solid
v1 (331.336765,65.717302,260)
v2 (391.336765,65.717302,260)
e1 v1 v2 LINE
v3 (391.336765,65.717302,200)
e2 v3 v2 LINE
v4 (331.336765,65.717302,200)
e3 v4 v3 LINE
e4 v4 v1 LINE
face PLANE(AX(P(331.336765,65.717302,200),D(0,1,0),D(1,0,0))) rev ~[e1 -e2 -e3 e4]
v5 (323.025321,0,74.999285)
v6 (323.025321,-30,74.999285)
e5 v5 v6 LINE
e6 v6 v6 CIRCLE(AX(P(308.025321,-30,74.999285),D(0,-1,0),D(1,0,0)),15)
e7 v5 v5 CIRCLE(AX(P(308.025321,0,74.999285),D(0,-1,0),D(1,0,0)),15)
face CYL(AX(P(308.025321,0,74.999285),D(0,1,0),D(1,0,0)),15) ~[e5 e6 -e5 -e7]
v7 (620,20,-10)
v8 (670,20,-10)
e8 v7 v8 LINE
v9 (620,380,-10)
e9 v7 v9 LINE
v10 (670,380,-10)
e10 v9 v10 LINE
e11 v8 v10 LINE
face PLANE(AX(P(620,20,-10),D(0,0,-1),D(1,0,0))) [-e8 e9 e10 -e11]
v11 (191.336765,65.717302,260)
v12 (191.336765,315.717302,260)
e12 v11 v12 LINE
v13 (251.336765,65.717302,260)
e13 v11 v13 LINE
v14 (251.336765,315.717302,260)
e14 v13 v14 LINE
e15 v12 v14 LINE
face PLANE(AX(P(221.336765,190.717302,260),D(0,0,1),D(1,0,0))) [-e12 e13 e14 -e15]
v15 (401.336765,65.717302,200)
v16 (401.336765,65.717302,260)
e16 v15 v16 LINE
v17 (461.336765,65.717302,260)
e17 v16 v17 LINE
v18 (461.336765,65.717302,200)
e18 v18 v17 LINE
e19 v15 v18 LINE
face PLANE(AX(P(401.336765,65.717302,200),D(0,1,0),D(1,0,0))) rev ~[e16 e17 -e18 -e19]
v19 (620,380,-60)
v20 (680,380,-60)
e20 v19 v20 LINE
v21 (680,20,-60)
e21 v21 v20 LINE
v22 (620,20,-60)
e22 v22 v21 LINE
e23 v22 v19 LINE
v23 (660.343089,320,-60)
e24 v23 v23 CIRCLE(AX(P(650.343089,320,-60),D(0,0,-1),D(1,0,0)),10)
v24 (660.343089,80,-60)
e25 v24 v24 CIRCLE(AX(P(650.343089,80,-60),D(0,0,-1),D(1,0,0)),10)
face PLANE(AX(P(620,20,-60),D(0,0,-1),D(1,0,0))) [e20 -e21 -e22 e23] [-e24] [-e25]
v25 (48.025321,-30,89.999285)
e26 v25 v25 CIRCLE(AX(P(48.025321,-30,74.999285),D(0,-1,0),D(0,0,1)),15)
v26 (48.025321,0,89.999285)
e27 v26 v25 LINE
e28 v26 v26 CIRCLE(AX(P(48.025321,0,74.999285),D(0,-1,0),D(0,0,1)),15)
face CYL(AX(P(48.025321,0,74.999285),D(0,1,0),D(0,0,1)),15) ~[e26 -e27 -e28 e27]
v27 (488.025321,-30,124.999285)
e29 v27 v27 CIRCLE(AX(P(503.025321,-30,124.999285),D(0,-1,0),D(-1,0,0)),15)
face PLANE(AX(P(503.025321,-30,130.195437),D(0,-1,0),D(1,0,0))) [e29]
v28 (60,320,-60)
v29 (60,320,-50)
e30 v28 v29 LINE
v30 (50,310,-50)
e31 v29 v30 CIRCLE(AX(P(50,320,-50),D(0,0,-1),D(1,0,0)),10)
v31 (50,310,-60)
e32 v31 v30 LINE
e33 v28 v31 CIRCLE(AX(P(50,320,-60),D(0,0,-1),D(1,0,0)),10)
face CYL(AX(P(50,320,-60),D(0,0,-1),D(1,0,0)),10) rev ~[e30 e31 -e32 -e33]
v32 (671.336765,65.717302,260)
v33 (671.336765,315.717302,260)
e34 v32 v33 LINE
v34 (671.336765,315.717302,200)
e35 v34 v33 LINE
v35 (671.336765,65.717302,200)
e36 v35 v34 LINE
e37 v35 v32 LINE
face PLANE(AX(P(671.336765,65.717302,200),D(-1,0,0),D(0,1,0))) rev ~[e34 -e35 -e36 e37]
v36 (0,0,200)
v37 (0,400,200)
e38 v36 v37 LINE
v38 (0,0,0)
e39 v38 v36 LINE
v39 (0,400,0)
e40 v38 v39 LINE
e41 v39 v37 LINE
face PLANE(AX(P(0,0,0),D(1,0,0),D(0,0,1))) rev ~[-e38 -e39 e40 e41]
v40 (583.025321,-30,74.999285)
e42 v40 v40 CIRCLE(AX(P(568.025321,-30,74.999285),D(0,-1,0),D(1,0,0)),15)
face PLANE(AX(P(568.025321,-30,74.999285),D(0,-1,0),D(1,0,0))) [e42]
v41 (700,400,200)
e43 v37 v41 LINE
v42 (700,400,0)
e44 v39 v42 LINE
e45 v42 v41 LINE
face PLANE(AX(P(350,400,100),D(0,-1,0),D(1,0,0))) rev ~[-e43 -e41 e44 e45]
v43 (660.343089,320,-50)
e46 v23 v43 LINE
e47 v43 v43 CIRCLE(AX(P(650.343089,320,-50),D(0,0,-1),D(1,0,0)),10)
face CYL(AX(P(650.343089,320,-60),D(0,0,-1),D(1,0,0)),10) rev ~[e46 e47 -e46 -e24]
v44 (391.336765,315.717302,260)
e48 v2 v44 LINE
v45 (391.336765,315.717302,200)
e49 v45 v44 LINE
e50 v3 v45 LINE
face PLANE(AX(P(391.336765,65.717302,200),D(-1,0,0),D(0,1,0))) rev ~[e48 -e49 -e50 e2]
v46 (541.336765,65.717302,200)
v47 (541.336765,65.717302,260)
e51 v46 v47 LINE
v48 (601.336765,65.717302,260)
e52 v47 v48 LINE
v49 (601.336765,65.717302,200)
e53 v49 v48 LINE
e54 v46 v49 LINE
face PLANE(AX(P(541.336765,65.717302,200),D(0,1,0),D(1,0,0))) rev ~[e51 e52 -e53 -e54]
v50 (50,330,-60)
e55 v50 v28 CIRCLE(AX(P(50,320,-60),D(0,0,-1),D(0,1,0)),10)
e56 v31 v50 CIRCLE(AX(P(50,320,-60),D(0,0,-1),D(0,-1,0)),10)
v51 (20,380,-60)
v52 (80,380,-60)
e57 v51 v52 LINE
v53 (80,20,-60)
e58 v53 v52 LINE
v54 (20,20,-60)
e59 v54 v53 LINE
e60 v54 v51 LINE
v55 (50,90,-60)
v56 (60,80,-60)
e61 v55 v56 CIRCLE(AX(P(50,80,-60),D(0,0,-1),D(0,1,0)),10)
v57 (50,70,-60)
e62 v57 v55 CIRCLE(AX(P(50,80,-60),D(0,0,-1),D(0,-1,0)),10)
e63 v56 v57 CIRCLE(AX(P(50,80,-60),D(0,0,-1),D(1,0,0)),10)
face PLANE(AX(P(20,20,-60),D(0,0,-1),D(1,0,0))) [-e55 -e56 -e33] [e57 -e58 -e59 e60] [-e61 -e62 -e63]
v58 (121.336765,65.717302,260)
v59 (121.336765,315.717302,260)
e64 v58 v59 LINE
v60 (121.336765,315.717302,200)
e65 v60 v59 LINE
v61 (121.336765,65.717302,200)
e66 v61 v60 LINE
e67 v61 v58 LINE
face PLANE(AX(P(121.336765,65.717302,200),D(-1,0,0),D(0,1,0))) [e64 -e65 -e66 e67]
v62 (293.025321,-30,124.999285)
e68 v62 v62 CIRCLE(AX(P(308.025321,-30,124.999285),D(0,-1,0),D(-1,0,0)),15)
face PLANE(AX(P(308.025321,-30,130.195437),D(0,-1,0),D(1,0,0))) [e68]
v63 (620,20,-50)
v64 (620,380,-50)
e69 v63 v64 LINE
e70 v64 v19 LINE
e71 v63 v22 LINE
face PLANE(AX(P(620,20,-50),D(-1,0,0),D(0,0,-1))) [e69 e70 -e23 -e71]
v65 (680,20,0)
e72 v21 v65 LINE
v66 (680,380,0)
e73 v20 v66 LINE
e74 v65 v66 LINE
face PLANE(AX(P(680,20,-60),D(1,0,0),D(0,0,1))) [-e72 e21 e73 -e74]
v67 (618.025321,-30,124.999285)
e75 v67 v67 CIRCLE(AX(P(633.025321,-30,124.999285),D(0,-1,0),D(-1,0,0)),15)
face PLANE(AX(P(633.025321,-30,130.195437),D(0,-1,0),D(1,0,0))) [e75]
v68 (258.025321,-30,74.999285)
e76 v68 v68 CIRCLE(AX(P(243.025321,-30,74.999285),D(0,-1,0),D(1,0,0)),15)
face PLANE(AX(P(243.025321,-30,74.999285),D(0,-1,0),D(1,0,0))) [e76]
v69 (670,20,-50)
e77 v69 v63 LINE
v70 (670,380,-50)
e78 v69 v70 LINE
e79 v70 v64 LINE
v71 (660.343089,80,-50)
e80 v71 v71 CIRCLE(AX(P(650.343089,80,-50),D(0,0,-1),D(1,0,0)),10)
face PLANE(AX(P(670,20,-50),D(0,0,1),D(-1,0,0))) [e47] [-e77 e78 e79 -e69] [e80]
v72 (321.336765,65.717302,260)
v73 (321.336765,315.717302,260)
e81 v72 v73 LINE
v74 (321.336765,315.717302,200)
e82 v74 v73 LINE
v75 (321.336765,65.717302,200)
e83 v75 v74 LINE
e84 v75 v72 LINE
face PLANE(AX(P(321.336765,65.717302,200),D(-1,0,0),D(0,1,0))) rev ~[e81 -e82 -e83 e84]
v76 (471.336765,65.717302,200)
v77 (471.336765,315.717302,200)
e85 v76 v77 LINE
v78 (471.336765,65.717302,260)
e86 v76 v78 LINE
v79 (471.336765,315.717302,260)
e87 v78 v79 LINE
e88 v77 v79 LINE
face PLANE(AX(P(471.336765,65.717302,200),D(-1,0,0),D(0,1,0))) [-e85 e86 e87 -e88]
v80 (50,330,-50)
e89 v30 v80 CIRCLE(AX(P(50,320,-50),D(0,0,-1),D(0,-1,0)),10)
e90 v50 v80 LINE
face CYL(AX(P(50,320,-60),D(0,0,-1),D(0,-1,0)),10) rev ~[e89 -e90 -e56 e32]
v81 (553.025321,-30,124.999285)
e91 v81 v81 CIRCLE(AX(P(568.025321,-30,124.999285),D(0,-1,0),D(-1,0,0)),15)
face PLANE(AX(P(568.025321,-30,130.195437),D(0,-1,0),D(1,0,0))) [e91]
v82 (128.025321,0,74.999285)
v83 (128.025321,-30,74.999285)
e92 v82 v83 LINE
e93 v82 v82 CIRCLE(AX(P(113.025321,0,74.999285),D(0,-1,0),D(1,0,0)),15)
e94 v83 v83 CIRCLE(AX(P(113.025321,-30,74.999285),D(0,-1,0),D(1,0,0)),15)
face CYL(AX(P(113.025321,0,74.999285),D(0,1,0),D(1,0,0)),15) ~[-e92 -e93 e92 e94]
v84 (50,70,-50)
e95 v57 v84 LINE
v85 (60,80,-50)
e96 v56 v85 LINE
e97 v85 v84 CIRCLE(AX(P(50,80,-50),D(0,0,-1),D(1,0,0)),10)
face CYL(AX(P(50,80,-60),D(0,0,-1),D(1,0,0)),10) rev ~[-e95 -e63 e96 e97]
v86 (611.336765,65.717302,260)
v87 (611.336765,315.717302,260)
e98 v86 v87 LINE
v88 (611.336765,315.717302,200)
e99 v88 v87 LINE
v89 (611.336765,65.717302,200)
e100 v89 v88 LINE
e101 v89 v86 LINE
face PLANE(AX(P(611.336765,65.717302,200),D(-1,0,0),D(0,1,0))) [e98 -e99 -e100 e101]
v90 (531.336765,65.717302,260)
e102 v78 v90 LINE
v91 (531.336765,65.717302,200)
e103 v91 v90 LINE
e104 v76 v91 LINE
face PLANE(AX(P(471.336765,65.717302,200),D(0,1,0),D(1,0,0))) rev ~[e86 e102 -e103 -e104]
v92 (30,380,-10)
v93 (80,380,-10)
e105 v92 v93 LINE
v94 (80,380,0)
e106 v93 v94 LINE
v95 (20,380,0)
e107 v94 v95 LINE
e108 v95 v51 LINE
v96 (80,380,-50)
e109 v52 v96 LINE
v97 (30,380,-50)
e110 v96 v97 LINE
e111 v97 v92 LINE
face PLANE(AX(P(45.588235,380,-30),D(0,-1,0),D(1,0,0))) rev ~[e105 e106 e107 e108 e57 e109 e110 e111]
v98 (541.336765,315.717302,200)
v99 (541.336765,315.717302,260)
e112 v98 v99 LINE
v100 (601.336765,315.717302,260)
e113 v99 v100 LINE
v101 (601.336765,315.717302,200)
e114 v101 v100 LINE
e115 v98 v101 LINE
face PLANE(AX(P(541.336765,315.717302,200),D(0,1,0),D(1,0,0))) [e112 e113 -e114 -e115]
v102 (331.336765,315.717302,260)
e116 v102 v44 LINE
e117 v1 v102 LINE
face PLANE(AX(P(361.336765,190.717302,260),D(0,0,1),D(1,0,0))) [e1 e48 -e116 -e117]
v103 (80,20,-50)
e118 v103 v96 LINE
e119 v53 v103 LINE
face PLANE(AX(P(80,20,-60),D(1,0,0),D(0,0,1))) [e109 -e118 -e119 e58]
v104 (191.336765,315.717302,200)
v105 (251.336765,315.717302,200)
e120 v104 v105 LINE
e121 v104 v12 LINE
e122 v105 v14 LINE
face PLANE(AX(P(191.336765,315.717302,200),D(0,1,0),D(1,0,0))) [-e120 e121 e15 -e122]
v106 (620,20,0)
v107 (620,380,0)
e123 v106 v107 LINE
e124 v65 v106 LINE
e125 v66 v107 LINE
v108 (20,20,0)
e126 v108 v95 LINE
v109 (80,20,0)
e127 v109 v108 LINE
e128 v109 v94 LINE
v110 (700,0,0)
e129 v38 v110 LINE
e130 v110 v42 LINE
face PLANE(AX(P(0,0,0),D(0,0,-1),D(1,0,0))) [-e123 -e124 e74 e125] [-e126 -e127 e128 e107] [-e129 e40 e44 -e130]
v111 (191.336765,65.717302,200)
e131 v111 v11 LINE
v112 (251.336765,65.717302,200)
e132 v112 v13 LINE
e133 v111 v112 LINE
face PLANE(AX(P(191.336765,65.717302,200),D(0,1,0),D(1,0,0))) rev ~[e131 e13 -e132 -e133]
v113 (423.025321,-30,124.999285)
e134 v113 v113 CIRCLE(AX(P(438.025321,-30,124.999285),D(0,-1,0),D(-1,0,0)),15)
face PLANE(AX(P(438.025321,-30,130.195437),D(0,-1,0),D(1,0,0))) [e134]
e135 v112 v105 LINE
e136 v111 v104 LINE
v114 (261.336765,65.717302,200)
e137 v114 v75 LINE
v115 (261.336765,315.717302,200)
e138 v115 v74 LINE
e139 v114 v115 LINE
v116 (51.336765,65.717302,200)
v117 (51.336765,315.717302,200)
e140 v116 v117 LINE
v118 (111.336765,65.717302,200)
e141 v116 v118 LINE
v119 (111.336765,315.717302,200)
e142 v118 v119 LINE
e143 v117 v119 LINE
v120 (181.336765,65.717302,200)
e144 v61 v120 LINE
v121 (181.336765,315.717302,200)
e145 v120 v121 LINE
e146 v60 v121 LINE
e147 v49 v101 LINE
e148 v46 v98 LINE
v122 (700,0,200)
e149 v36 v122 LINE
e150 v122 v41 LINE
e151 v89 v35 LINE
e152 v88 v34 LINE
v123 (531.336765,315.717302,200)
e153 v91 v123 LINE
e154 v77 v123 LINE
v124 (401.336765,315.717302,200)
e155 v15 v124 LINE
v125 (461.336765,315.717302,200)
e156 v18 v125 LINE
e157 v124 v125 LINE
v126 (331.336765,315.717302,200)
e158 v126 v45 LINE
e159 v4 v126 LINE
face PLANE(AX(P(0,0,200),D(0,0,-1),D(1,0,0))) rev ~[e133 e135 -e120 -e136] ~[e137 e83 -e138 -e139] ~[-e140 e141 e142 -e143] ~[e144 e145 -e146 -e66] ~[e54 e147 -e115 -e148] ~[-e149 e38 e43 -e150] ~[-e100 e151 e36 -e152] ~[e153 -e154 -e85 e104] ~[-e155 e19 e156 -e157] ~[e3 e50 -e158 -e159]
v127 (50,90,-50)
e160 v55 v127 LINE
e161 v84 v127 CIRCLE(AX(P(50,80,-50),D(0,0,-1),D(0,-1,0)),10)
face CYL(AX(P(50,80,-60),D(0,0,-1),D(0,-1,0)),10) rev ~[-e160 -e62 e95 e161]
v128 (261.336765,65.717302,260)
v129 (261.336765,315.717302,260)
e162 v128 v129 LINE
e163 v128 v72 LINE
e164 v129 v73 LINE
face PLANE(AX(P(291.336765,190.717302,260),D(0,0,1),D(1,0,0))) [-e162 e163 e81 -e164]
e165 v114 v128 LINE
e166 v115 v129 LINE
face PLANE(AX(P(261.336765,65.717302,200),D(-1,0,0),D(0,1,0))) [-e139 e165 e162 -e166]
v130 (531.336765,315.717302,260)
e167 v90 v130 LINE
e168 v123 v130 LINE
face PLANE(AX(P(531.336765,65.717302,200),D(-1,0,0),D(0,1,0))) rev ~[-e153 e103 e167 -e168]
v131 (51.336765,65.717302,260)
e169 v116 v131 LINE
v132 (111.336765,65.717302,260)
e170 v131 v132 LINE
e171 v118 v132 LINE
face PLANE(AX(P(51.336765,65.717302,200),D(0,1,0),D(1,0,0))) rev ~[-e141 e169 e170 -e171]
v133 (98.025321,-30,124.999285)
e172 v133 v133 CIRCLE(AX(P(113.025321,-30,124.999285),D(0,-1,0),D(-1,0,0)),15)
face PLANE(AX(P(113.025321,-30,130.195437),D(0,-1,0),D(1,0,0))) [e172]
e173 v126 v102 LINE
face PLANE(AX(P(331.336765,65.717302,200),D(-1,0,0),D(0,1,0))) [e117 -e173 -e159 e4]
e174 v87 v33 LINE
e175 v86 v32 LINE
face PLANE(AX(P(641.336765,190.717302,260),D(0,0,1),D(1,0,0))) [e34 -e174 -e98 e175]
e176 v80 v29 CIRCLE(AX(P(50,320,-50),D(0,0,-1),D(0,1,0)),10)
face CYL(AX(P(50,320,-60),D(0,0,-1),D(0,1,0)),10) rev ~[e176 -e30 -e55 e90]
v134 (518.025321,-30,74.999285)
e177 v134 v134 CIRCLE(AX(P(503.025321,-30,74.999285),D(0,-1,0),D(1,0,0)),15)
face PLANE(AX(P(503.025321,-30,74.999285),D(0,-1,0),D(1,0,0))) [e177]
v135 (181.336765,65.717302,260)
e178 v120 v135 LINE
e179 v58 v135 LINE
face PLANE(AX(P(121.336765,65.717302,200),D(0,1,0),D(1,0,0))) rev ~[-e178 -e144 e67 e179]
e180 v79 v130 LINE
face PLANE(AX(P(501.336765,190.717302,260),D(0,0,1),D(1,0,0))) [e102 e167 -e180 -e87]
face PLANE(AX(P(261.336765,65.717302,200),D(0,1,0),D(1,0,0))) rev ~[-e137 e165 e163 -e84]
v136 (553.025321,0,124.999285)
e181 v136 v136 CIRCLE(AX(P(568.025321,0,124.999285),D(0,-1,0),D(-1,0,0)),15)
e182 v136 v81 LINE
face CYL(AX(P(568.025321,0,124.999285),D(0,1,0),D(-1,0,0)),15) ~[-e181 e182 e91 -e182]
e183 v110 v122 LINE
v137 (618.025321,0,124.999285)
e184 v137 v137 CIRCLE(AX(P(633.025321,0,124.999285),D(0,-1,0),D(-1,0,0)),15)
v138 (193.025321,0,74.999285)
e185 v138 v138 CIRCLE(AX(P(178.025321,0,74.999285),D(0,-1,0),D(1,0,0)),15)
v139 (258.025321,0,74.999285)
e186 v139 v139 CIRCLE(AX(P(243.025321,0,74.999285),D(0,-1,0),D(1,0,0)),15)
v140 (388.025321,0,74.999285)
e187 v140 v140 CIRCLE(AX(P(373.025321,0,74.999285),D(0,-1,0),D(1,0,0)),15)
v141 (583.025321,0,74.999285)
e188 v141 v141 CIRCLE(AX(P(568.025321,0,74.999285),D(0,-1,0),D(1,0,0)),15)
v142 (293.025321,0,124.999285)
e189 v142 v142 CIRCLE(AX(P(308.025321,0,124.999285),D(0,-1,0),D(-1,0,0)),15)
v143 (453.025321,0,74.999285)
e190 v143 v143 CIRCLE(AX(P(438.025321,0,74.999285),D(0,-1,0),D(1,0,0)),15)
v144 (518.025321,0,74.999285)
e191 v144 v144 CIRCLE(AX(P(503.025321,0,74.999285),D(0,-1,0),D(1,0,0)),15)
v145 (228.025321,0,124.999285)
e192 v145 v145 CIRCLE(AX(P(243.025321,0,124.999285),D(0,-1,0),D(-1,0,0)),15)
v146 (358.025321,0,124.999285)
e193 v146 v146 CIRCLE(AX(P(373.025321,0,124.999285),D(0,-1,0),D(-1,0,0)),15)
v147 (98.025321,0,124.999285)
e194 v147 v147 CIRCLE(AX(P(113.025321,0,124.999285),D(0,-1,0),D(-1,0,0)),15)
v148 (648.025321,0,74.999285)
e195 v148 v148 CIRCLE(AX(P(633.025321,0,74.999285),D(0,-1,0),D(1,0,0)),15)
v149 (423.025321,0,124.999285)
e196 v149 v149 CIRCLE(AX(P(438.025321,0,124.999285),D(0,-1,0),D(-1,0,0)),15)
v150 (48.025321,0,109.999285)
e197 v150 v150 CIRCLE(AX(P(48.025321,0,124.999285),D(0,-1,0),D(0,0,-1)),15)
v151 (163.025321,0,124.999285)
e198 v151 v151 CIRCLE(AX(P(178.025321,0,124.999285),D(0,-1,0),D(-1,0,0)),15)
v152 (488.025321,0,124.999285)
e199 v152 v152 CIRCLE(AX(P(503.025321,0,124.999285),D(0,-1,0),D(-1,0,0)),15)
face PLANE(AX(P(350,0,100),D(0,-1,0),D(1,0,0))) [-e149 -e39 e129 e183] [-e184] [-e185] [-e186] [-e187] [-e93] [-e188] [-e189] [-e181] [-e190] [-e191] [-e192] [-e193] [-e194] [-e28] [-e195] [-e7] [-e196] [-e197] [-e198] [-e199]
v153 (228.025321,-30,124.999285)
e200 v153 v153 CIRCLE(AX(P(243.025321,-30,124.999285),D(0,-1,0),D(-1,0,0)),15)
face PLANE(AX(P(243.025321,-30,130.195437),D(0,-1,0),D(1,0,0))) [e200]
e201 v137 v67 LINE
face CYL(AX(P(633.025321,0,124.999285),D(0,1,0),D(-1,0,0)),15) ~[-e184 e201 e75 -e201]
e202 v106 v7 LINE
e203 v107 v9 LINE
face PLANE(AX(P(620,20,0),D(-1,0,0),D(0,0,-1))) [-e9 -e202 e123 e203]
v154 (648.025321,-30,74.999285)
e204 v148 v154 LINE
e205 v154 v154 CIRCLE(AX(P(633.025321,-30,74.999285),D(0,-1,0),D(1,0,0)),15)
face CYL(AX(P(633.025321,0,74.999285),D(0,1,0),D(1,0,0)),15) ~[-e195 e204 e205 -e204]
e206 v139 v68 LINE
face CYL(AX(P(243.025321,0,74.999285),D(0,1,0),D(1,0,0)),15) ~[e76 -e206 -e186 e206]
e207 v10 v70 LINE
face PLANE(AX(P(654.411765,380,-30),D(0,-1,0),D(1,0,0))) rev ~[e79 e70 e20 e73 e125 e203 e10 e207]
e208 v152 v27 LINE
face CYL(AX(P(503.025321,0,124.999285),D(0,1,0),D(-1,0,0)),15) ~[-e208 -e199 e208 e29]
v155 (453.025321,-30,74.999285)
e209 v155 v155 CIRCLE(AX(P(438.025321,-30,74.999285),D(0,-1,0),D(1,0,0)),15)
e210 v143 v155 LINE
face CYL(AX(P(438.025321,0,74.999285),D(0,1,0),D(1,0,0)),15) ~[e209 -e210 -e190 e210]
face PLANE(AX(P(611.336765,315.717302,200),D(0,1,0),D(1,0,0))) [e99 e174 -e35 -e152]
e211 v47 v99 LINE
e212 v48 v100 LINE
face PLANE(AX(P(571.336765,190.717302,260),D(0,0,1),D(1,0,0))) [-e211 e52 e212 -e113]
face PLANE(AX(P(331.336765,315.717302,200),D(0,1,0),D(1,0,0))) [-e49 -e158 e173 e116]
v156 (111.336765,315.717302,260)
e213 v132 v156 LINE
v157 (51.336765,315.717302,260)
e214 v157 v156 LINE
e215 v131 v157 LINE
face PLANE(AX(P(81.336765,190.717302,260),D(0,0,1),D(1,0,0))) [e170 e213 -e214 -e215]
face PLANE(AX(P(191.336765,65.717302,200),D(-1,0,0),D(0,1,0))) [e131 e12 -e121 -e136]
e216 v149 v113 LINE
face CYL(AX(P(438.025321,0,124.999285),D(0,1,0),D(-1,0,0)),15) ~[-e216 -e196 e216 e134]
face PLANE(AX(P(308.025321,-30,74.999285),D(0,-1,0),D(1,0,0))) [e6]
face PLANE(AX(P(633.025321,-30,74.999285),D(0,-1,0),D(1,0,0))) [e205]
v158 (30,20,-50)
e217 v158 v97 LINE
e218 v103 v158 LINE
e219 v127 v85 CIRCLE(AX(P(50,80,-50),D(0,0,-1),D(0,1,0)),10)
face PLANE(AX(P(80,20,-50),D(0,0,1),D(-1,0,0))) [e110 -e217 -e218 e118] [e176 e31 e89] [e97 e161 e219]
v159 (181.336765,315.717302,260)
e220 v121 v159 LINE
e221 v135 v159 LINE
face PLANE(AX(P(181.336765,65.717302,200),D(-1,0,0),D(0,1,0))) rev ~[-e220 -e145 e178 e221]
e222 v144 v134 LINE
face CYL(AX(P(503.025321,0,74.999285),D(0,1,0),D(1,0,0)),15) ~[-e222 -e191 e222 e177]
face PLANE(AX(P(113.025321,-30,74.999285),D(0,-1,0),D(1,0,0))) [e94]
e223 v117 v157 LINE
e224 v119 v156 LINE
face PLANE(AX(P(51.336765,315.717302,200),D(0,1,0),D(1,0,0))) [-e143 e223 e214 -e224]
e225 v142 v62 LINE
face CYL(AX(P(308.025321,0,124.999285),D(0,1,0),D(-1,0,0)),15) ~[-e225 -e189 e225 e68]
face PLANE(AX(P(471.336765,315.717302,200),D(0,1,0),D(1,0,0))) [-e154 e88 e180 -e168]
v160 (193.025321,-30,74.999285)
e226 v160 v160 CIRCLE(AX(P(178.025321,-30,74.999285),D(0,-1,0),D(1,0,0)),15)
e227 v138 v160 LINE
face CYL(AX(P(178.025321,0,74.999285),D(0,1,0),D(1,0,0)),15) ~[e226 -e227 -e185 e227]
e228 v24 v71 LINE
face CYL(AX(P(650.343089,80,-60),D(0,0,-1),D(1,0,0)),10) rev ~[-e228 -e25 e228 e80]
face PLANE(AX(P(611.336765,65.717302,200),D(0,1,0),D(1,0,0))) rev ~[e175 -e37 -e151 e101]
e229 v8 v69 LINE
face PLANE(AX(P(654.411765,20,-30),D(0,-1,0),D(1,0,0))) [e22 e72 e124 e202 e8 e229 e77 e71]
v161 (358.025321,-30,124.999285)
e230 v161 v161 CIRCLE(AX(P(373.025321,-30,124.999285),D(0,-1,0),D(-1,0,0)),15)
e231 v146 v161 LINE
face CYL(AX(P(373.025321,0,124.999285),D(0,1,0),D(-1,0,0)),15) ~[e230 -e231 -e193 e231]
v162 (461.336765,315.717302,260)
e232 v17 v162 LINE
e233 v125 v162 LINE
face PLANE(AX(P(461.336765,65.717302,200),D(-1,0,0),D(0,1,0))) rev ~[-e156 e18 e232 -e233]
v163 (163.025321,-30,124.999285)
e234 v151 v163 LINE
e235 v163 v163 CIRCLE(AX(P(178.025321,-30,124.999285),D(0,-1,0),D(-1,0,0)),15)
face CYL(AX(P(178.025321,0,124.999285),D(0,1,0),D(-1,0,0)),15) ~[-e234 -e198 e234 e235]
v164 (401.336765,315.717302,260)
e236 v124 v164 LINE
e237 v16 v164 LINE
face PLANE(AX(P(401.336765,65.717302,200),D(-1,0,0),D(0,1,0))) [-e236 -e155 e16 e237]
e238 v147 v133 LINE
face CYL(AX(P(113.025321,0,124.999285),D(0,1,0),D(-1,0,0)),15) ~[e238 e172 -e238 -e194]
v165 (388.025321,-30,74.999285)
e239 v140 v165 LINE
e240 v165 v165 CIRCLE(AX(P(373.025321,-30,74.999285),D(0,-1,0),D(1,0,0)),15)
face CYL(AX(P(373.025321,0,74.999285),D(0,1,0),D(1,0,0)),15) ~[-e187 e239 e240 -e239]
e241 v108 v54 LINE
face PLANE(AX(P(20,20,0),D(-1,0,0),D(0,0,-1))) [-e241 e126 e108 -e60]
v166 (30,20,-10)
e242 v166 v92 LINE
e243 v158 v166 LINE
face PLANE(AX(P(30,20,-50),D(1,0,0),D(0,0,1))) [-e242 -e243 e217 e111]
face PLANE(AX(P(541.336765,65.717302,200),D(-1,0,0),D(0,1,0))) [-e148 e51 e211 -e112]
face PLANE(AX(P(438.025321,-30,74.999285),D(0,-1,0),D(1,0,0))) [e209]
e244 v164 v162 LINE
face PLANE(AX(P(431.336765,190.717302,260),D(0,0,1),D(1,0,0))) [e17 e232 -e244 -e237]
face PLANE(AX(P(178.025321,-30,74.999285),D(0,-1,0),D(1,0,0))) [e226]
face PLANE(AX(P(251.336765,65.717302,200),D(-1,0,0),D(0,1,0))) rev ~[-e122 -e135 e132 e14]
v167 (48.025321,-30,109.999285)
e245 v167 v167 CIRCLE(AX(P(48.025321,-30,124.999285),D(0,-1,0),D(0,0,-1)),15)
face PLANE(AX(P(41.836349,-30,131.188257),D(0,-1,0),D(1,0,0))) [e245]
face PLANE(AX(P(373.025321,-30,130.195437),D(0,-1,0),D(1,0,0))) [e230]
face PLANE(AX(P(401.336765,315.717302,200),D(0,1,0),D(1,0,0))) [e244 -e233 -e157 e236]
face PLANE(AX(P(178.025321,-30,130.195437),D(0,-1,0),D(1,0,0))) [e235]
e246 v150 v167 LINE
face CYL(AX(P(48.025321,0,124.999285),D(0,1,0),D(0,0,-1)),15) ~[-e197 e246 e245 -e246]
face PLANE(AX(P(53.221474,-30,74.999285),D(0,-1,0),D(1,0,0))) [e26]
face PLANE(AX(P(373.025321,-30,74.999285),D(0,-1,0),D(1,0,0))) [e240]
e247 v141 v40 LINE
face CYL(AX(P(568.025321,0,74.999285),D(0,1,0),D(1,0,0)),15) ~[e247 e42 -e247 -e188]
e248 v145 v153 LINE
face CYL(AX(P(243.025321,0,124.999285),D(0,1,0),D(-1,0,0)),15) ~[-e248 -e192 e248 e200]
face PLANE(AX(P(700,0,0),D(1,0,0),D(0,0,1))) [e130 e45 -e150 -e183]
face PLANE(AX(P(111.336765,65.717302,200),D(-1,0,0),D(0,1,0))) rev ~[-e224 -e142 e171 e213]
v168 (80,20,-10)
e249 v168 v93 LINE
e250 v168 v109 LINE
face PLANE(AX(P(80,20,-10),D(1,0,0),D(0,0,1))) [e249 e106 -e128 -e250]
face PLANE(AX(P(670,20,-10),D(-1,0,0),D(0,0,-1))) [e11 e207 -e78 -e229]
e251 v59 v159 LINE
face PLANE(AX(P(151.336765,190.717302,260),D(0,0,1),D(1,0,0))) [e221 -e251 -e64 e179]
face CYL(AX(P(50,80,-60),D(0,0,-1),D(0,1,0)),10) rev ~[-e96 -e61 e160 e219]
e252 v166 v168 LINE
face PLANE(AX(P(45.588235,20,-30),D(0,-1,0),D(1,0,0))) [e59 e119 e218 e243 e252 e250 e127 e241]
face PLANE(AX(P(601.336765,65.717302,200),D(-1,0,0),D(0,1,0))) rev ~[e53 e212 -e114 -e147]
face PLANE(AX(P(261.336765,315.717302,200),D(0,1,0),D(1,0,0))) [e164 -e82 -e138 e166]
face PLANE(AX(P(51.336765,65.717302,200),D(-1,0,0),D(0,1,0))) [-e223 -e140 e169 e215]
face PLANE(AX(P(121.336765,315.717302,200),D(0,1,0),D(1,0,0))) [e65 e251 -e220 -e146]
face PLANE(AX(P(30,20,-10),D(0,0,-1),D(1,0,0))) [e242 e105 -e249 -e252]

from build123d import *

# Parameters (mm, degrees)
F0_W      = 700
F0_H      = 200
F1_DEPTH  = 400
F4_DEPTH  = 360
F5_R      = 15
F6_DEPTH  = 30
F7_W      = 60
F7_H      = 250
F8_DEPTH  = 60
F9_R      = 10
F10_DEPTH = 25


# Not quite as in the source:
# - a feature names something its author has since deleted; it is built from what else it names


with BuildPart() as f1:
    # F0 (on Front) → F1 (new body)
    with BuildSketch(Plane.XZ):
        with Locations((350, 100)):
            Rectangle(F0_W, F0_H)
    extrude(amount=-F1_DEPTH)

    # F3 (on offset) → F4 (join)
    with BuildSketch(Plane.XZ.offset(-20)):
        Polygon((20, -10), (20, -19.140496552), (20, -50), (20, -60), (30, -60), (80, -60), (80, -50), (30, -50), (30, -10), (80, -10), (80, 0), (20, 0), align=None)
        Polygon((680, -10), (680, 0), (620, 0), (620, -10), (670, -10), (670, -50), (620, -50), (620, -60), (670, -60), (680, -60), align=None)
    extrude(amount=-F4_DEPTH)

    # F5 (on face) → F6 (join)
    with BuildSketch(Plane.XZ):
        with BuildLine():
            ThreePointArc((48.0253212154, 139.9992847443), (37.4187194976, 135.6058864621), (33.0253212154, 124.9992847443))
            Line((33.0253212154, 124.9992847443), (48.0253212154, 124.9992847443))
            Line((48.0253212154, 124.9992847443), (48.0253212154, 139.9992847443))
        make_face()
        with BuildLine():
            ThreePointArc((648.0253212154, 124.9992847443), (633.0253212154, 139.9992847443), (618.0253212154, 124.9992847443))
            Line((618.0253212154, 124.9992847443), (648.0253212154, 124.9992847443))
        make_face()
        with BuildLine():
            Line((648.0253212154, 124.9992847443), (618.0253212154, 124.9992847443))
            ThreePointArc((618.0253212154, 124.9992847443), (633.0253212154, 109.9992847443), (648.0253212154, 124.9992847443))
        make_face()
        with BuildLine():
            ThreePointArc((583.0253212154, 124.9992847443), (568.0253212154, 139.9992847443), (553.0253212154, 124.9992847443))
            Line((553.0253212154, 124.9992847443), (583.0253212154, 124.9992847443))
        make_face()
        with BuildLine():
            Line((583.0253212154, 124.9992847443), (553.0253212154, 124.9992847443))
            ThreePointArc((553.0253212154, 124.9992847443), (568.0253212154, 109.9992847443), (583.0253212154, 124.9992847443))
        make_face()
        with BuildLine():
            ThreePointArc((518.0253212154, 124.9992847443), (503.0253212154, 139.9992847443), (488.0253212154, 124.9992847443))
            Line((488.0253212154, 124.9992847443), (518.0253212154, 124.9992847443))
        make_face()
        with BuildLine():
            Line((518.0253212154, 124.9992847443), (488.0253212154, 124.9992847443))
            ThreePointArc((488.0253212154, 124.9992847443), (503.0253212154, 109.9992847443), (518.0253212154, 124.9992847443))
        make_face()
        with BuildLine():
            ThreePointArc((453.0253212154, 124.9992847443), (438.0253212154, 139.9992847443), (423.0253212154, 124.9992847443))
            Line((423.0253212154, 124.9992847443), (453.0253212154, 124.9992847443))
        make_face()
        with BuildLine():
            Line((453.0253212154, 124.9992847443), (423.0253212154, 124.9992847443))
            ThreePointArc((423.0253212154, 124.9992847443), (438.0253212154, 109.9992847443), (453.0253212154, 124.9992847443))
        make_face()
        with BuildLine():
            ThreePointArc((388.0253212154, 124.9992847443), (373.0253212154, 139.9992847443), (358.0253212154, 124.9992847443))
            Line((358.0253212154, 124.9992847443), (388.0253212154, 124.9992847443))
        make_face()
        with BuildLine():
            Line((388.0253212154, 124.9992847443), (358.0253212154, 124.9992847443))
            ThreePointArc((358.0253212154, 124.9992847443), (373.0253212154, 109.9992847443), (388.0253212154, 124.9992847443))
        make_face()
        with BuildLine():
            ThreePointArc((323.0253212154, 124.9992847443), (308.0253212154, 139.9992847443), (293.0253212154, 124.9992847443))
            Line((293.0253212154, 124.9992847443), (323.0253212154, 124.9992847443))
        make_face()
        with BuildLine():
            Line((323.0253212154, 124.9992847443), (293.0253212154, 124.9992847443))
            ThreePointArc((293.0253212154, 124.9992847443), (308.0253212154, 109.9992847443), (323.0253212154, 124.9992847443))
        make_face()
        with BuildLine():
            ThreePointArc((258.0253212154, 124.9992847443), (243.0253212154, 139.9992847443), (228.0253212154, 124.9992847443))
            Line((228.0253212154, 124.9992847443), (258.0253212154, 124.9992847443))
        make_face()
        with BuildLine():
            Line((258.0253212154, 124.9992847443), (228.0253212154, 124.9992847443))
            ThreePointArc((228.0253212154, 124.9992847443), (243.0253212154, 109.9992847443), (258.0253212154, 124.9992847443))
        make_face()
        with BuildLine():
            ThreePointArc((193.0253212154, 124.9992847443), (178.0253212154, 139.9992847443), (163.0253212154, 124.9992847443))
            Line((163.0253212154, 124.9992847443), (193.0253212154, 124.9992847443))
        make_face()
        with BuildLine():
            Line((193.0253212154, 124.9992847443), (163.0253212154, 124.9992847443))
            ThreePointArc((163.0253212154, 124.9992847443), (178.0253212154, 109.9992847443), (193.0253212154, 124.9992847443))
        make_face()
        with BuildLine():
            ThreePointArc((128.0253212154, 124.9992847443), (113.0253212154, 139.9992847443), (98.0253212154, 124.9992847443))
            Line((98.0253212154, 124.9992847443), (128.0253212154, 124.9992847443))
        make_face()
        with BuildLine():
            Line((128.0253212154, 124.9992847443), (98.0253212154, 124.9992847443))
            ThreePointArc((98.0253212154, 124.9992847443), (113.0253212154, 109.9992847443), (128.0253212154, 124.9992847443))
        make_face()
        with BuildLine():
            ThreePointArc((63.0253212154, 74.9992847443), (58.6319229332, 85.6058864621), (48.0253212154, 89.9992847443))
            Line((48.0253212154, 89.9992847443), (48.0253212154, 59.9992847443))
            ThreePointArc((48.0253212154, 59.9992847443), (58.6319229332, 64.3926830265), (63.0253212154, 74.9992847443))
        make_face()
        with BuildLine():
            Line((48.0253212154, 59.9992847443), (48.0253212154, 89.9992847443))
            ThreePointArc((48.0253212154, 89.9992847443), (33.0253212154, 74.9992847443), (48.0253212154, 59.9992847443))
        make_face()
        with BuildLine():
            Line((48.0253212154, 124.9992847443), (33.0253212154, 124.9992847443))
            ThreePointArc((33.0253212154, 124.9992847443), (37.4187194976, 114.3926830265), (48.0253212154, 109.9992847443))
            Line((48.0253212154, 109.9992847443), (48.0253212154, 124.9992847443))
        make_face()
        with BuildLine():
            Line((48.0253212154, 139.9992847443), (48.0253212154, 124.9992847443))
            Line((48.0253212154, 124.9992847443), (63.0253212154, 124.9992847443))
            ThreePointArc((63.0253212154, 124.9992847443), (58.6319229332, 135.6058864621), (48.0253212154, 139.9992847443))
        make_face()
        with BuildLine():
            Line((63.0253212154, 124.9992847443), (48.0253212154, 124.9992847443))
            Line((48.0253212154, 124.9992847443), (48.0253212154, 109.9992847443))
            ThreePointArc((48.0253212154, 109.9992847443), (58.6319229332, 114.3926830265), (63.0253212154, 124.9992847443))
        make_face()
        with Locations((113.0253212154, 74.9992847443)):
            Circle(F5_R)
        with Locations((178.0253212154, 74.9992847443)):
            Circle(F5_R)
        with Locations((243.0253212154, 74.9992847443)):
            Circle(F5_R)
        with Locations((308.0253212154, 74.9992847443)):
            Circle(F5_R)
        with Locations((373.0253212154, 74.9992847443)):
            Circle(F5_R)
        with Locations((438.0253212154, 74.9992847443)):
            Circle(F5_R)
        with Locations((503.0253212154, 74.9992847443)):
            Circle(F5_R)
        with Locations((568.0253212154, 74.9992847443)):
            Circle(F5_R)
        with Locations((633.0253212154, 74.9992847443)):
            Circle(F5_R)
    extrude(amount=F6_DEPTH)

    # F7 (on face) → F8 (join)
    with BuildSketch(Plane.XY.offset(200)):
        with Locations((81.3367652893, 190.7173022628)):
            Rectangle(F7_W, F7_H)
        with Locations((151.3367652893, 190.7173022628)):
            Rectangle(F7_W, F7_H)
        with Locations((221.3367652893, 190.7173022628)):
            Rectangle(F7_W, F7_H)
        with Locations((291.3367652893, 190.7173022628)):
            Rectangle(F7_W, F7_H)
        with Locations((361.3367652893, 190.7173022628)):
            Rectangle(F7_W, F7_H)
        with Locations((431.3367652893, 190.7173022628)):
            Rectangle(F7_W, F7_H)
        with Locations((501.3367652893, 190.7173022628)):
            Rectangle(F7_W, F7_H)
        with Locations((571.3367652893, 190.7173022628)):
            Rectangle(F7_W, F7_H)
        with Locations((641.3367652893, 190.7173022628)):
            Rectangle(F7_W, F7_H)
    extrude(amount=F8_DEPTH)

    # F9 (on face) → F10 (cut)
    with BuildSketch(Plane(origin=(0, 0, -60), x_dir=(1, 0, 0), z_dir=(0, 0, -1))):
        with BuildLine():
            ThreePointArc((50, -310), (40, -320), (50, -330))
            Line((50, -330), (50, -310))
        make_face()
        with BuildLine():
            ThreePointArc((50, -70), (40, -80), (50, -90))
            Line((50, -90), (50, -70))
        make_face()
        with BuildLine():
            Line((50, -70), (50, -90))
            ThreePointArc((50, -90), (57.0710678119, -87.0710678119), (60, -80))
            ThreePointArc((60, -80), (57.0710678119, -72.9289321881), (50, -70))
        make_face()
        with BuildLine():
            Line((50, -310), (50, -330))
            ThreePointArc((50, -330), (57.0710678119, -327.0710678119), (60, -320))
            ThreePointArc((60, -320), (57.0710678119, -312.9289321881), (50, -310))
        make_face()
        with Locations((650.3430891037, -320)):
            Circle(F9_R)
        with Locations((650.3430891037, -80)):
            Circle(F9_R)
    extrude(amount=-F10_DEPTH, mode=Mode.SUBTRACT)


solid = f1.part
